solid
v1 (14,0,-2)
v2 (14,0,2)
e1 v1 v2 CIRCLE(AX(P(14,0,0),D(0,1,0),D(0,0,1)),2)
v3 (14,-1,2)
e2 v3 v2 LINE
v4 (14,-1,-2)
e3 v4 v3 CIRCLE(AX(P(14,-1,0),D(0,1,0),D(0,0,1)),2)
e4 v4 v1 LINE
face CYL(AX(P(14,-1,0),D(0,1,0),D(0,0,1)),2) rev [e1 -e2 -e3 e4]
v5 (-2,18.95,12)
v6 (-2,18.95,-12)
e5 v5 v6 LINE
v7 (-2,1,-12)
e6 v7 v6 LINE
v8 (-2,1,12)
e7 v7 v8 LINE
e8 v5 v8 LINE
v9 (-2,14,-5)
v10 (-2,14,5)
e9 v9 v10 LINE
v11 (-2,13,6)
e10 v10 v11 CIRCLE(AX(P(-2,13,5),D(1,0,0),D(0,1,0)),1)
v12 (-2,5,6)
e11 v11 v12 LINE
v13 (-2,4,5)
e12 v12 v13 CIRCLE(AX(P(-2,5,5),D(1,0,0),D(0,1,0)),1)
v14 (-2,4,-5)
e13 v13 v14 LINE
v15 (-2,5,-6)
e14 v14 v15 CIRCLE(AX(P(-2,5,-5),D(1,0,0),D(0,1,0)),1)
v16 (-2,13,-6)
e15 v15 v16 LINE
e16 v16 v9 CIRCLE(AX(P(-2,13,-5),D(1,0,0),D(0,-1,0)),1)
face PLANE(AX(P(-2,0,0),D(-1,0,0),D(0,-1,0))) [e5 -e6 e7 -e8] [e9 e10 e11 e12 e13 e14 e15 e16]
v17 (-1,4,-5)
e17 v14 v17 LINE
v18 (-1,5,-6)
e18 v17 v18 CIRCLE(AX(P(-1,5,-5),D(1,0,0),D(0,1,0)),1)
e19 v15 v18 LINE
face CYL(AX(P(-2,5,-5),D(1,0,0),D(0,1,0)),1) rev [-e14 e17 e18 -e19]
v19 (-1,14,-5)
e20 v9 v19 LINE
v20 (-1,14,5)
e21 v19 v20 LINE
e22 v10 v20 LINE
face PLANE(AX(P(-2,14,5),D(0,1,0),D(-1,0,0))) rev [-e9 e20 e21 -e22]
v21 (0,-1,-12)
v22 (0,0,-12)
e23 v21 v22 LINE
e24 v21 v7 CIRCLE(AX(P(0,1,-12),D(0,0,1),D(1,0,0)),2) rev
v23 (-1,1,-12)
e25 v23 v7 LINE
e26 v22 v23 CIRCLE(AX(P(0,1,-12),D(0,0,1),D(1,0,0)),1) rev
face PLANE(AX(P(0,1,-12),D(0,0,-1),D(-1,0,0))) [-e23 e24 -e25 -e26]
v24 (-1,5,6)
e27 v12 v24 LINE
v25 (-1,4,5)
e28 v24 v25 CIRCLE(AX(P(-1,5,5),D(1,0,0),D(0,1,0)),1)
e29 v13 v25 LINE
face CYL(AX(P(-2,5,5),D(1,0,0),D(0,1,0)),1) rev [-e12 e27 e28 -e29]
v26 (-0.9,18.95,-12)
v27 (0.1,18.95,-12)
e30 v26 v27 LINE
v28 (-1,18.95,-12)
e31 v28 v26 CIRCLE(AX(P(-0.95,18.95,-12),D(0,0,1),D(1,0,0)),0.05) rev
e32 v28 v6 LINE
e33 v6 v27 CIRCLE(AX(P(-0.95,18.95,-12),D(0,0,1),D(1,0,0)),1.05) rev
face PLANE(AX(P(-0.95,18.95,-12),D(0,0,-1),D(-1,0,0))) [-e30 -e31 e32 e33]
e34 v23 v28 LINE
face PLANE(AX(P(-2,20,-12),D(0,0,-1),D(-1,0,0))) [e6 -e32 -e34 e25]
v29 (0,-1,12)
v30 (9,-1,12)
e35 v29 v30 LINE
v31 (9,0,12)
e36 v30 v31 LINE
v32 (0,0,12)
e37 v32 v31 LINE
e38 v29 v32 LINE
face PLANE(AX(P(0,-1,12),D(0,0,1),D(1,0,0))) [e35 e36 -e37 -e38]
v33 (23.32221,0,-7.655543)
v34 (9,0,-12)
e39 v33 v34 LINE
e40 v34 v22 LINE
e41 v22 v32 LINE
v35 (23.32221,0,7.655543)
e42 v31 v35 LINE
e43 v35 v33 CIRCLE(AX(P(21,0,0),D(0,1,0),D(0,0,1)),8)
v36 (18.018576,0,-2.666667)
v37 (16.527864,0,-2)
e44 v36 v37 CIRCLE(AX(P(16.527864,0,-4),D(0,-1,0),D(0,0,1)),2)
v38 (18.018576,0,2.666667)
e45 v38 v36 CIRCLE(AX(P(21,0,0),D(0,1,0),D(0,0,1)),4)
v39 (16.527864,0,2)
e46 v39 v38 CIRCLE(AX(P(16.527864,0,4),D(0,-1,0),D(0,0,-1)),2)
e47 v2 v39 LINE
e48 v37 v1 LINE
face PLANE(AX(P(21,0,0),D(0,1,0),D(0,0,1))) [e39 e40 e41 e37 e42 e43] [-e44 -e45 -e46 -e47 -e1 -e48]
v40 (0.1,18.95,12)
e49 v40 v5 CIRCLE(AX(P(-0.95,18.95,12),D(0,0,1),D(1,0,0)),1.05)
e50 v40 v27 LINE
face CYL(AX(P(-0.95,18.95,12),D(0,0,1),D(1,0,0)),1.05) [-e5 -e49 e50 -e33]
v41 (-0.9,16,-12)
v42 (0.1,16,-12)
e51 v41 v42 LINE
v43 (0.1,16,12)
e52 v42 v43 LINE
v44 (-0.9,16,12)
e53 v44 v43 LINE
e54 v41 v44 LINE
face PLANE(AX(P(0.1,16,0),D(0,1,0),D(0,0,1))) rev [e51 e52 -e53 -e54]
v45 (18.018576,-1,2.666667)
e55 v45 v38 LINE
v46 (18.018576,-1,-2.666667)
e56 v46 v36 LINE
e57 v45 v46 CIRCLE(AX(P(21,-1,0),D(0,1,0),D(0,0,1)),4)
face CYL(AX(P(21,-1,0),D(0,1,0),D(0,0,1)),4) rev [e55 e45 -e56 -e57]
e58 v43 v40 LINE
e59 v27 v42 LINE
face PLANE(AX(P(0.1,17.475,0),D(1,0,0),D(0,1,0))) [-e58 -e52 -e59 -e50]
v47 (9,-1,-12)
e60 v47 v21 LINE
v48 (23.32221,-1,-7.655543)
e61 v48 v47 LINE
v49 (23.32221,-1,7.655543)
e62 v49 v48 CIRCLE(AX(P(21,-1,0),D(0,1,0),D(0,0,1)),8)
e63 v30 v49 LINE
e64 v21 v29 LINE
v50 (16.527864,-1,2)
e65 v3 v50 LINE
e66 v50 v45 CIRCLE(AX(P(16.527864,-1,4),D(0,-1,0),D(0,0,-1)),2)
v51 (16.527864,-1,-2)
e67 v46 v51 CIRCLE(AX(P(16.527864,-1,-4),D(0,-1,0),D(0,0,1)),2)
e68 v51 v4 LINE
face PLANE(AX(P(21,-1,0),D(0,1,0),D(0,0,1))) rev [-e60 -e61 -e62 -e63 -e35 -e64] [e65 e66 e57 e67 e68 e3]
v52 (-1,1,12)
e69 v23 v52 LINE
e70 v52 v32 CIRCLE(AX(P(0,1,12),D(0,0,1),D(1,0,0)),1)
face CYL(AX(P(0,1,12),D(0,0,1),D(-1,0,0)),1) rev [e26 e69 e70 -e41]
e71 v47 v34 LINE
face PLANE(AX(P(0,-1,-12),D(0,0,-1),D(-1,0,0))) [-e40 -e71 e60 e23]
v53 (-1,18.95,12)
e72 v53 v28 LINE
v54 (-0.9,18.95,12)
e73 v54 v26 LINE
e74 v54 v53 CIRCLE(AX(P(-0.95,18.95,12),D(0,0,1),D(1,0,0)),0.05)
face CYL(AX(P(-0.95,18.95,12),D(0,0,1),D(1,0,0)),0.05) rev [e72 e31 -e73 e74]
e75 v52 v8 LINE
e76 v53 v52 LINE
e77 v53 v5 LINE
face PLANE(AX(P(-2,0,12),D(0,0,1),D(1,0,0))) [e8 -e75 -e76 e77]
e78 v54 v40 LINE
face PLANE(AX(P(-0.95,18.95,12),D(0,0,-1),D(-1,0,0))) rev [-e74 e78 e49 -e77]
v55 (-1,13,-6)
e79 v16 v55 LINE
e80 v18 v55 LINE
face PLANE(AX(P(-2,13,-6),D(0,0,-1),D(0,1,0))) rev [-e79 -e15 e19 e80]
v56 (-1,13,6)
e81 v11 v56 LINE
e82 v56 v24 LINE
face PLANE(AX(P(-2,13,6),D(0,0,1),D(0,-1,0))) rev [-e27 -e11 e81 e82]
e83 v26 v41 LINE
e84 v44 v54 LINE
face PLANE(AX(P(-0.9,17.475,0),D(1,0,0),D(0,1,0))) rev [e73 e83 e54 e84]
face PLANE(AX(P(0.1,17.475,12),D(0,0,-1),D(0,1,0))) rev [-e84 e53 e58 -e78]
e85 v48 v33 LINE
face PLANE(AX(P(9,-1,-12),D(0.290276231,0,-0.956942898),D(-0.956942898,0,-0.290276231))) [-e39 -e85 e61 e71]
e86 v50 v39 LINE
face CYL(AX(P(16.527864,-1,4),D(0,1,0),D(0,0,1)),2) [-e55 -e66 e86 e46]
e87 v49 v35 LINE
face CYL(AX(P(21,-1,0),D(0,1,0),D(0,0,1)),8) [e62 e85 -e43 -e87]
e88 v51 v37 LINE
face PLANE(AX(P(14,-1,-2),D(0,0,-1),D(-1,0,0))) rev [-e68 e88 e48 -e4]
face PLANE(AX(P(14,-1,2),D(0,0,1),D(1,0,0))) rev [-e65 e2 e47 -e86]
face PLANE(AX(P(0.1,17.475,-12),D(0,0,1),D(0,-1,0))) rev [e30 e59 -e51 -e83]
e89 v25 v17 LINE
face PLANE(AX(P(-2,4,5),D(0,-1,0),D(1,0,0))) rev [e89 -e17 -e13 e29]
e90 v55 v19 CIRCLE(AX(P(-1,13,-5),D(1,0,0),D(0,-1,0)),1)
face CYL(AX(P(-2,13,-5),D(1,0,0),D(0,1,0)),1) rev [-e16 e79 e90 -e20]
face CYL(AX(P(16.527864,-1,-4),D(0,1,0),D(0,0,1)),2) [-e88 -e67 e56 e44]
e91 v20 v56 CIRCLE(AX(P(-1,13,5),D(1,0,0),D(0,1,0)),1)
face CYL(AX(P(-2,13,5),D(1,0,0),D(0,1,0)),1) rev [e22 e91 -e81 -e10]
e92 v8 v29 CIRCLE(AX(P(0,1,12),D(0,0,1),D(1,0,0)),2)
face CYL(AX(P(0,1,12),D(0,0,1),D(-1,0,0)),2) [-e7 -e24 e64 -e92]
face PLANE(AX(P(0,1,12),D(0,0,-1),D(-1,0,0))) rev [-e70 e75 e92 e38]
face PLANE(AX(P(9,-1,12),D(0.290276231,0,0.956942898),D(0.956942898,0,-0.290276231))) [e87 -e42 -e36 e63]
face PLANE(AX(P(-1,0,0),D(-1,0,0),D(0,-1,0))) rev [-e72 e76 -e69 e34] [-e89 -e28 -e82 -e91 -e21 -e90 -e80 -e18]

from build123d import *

# Parameters (mm, degrees)
BASE_FLANGE1_DEPTH = 1
EDGE_FLANGE1_DEPTH = 24
HEM1_START         = -12
HEM1_DEPTH         = 24
HEM1_2_DEPTH       = 24
CUT_EXTRUDE1_DEPTH = 10


# Read off the part's stored shape, not the designer's step: Hem1
# Sheet-metal steps are written as plain solids
with BuildPart() as part:
    # Sketch1 → Base-Flange1 (new body)
    with BuildSketch(Plane(origin=(0, 0, 0), x_dir=(1, 0, 0), z_dir=(0, 1, 0))):
        with BuildLine():
            Line((0, 12), (9, 12))
            Line((9, 12), (23.322209849, 7.655543182))
            ThreePointArc((23.322209849, 7.655543182), (29, 0), (23.322209849, -7.655543182))
            Line((23.322209849, -7.655543182), (9, -12))
            Line((9, -12), (0, -12))
            Line((0, -12), (0, 12))
        make_face()
        with BuildLine():
            Line((14, 2), (16.527864045, 2))
            ThreePointArc((16.527864045, 2), (17.344360626, 2.174258142), (18.01857603, 2.666666667))
            ThreePointArc((18.01857603, 2.666666667), (25, 0), (18.01857603, -2.666666667))
            ThreePointArc((18.01857603, -2.666666667), (17.344360626, -2.174258142), (16.527864045, -2))
            Line((16.527864045, -2), (14, -2))
            ThreePointArc((14, -2), (12, 0), (14, 2))
        make_face(mode=Mode.SUBTRACT)
    extrude(amount=-BASE_FLANGE1_DEPTH)

    # Edge-Flange1 section (across the edge) → Edge-Flange1 (add)
    with BuildSketch(Plane(origin=(-1, 0, -12), x_dir=(1, 0, 0), z_dir=(0, 0, 1))):
        with BuildLine():
            Line((-1, 1), (-1, 20))
            Line((-1, 20), (0, 20))
            Line((0, 20), (0, 1))
            ThreePointArc((0, 1), (0.292893219, 0.292893219), (1, 0))
            Line((1, 0), (1, -1))
            ThreePointArc((1, -1), (-0.414213562, -0.414213562), (-1, 1))
        make_face()
    extrude(amount=EDGE_FLANGE1_DEPTH)

    # Hem1 outline → Hem1 (cut)
    with BuildSketch(Plane.XY.offset(HEM1_START)):
        with BuildLine():
            ThreePointArc((-2, 18.95), (-1.709934208, 19.674568837), (-1, 19.998808848))
            Line((-1, 19.998808848), (-1, 20))
            Line((-1, 20), (-2, 20))
            Line((-2, 20), (-2, 18.95))
        make_face()
    extrude(amount=HEM1_DEPTH, mode=Mode.SUBTRACT)

    # Hem1 2 outline → Hem1 2 (add)
    with BuildSketch(Plane.XY.offset(HEM1_START)):
        with BuildLine():
            Line((-0.9, 16), (0.1, 16))
            Line((0.1, 16), (0.1, 18.95))
            ThreePointArc((0.1, 18.95), (-0.225431163, 19.709934208), (-1, 19.998808848))
            Line((-1, 19.998808848), (-1, 18.95))
            ThreePointArc((-1, 18.95), (-0.95, 19), (-0.9, 18.95))
            Line((-0.9, 18.95), (-0.9, 16))
        make_face()
    extrude(amount=HEM1_2_DEPTH)

    # Sketch13 → Cut-Extrude1 (cut)
    with BuildSketch(Plane(origin=(-1, 0, 0), x_dir=(0, 0, -1), z_dir=(1, 0, 0))):
        with BuildLine():
            Line((-5, 14), (5, 14))
            ThreePointArc((5, 14), (5.707106781, 13.707106781), (6, 13))
            Line((6, 13), (6, 5))
            ThreePointArc((6, 5), (5.707106781, 4.292893219), (5, 4))
            Line((5, 4), (-5, 4))
            ThreePointArc((-5, 4), (-5.707106781, 4.292893219), (-6, 5))
            Line((-6, 5), (-6, 13))
            ThreePointArc((-6, 13), (-5.707106781, 13.707106781), (-5, 14))
        make_face()
    extrude(amount=-CUT_EXTRUDE1_DEPTH, mode=Mode.SUBTRACT)


solid = part.part
